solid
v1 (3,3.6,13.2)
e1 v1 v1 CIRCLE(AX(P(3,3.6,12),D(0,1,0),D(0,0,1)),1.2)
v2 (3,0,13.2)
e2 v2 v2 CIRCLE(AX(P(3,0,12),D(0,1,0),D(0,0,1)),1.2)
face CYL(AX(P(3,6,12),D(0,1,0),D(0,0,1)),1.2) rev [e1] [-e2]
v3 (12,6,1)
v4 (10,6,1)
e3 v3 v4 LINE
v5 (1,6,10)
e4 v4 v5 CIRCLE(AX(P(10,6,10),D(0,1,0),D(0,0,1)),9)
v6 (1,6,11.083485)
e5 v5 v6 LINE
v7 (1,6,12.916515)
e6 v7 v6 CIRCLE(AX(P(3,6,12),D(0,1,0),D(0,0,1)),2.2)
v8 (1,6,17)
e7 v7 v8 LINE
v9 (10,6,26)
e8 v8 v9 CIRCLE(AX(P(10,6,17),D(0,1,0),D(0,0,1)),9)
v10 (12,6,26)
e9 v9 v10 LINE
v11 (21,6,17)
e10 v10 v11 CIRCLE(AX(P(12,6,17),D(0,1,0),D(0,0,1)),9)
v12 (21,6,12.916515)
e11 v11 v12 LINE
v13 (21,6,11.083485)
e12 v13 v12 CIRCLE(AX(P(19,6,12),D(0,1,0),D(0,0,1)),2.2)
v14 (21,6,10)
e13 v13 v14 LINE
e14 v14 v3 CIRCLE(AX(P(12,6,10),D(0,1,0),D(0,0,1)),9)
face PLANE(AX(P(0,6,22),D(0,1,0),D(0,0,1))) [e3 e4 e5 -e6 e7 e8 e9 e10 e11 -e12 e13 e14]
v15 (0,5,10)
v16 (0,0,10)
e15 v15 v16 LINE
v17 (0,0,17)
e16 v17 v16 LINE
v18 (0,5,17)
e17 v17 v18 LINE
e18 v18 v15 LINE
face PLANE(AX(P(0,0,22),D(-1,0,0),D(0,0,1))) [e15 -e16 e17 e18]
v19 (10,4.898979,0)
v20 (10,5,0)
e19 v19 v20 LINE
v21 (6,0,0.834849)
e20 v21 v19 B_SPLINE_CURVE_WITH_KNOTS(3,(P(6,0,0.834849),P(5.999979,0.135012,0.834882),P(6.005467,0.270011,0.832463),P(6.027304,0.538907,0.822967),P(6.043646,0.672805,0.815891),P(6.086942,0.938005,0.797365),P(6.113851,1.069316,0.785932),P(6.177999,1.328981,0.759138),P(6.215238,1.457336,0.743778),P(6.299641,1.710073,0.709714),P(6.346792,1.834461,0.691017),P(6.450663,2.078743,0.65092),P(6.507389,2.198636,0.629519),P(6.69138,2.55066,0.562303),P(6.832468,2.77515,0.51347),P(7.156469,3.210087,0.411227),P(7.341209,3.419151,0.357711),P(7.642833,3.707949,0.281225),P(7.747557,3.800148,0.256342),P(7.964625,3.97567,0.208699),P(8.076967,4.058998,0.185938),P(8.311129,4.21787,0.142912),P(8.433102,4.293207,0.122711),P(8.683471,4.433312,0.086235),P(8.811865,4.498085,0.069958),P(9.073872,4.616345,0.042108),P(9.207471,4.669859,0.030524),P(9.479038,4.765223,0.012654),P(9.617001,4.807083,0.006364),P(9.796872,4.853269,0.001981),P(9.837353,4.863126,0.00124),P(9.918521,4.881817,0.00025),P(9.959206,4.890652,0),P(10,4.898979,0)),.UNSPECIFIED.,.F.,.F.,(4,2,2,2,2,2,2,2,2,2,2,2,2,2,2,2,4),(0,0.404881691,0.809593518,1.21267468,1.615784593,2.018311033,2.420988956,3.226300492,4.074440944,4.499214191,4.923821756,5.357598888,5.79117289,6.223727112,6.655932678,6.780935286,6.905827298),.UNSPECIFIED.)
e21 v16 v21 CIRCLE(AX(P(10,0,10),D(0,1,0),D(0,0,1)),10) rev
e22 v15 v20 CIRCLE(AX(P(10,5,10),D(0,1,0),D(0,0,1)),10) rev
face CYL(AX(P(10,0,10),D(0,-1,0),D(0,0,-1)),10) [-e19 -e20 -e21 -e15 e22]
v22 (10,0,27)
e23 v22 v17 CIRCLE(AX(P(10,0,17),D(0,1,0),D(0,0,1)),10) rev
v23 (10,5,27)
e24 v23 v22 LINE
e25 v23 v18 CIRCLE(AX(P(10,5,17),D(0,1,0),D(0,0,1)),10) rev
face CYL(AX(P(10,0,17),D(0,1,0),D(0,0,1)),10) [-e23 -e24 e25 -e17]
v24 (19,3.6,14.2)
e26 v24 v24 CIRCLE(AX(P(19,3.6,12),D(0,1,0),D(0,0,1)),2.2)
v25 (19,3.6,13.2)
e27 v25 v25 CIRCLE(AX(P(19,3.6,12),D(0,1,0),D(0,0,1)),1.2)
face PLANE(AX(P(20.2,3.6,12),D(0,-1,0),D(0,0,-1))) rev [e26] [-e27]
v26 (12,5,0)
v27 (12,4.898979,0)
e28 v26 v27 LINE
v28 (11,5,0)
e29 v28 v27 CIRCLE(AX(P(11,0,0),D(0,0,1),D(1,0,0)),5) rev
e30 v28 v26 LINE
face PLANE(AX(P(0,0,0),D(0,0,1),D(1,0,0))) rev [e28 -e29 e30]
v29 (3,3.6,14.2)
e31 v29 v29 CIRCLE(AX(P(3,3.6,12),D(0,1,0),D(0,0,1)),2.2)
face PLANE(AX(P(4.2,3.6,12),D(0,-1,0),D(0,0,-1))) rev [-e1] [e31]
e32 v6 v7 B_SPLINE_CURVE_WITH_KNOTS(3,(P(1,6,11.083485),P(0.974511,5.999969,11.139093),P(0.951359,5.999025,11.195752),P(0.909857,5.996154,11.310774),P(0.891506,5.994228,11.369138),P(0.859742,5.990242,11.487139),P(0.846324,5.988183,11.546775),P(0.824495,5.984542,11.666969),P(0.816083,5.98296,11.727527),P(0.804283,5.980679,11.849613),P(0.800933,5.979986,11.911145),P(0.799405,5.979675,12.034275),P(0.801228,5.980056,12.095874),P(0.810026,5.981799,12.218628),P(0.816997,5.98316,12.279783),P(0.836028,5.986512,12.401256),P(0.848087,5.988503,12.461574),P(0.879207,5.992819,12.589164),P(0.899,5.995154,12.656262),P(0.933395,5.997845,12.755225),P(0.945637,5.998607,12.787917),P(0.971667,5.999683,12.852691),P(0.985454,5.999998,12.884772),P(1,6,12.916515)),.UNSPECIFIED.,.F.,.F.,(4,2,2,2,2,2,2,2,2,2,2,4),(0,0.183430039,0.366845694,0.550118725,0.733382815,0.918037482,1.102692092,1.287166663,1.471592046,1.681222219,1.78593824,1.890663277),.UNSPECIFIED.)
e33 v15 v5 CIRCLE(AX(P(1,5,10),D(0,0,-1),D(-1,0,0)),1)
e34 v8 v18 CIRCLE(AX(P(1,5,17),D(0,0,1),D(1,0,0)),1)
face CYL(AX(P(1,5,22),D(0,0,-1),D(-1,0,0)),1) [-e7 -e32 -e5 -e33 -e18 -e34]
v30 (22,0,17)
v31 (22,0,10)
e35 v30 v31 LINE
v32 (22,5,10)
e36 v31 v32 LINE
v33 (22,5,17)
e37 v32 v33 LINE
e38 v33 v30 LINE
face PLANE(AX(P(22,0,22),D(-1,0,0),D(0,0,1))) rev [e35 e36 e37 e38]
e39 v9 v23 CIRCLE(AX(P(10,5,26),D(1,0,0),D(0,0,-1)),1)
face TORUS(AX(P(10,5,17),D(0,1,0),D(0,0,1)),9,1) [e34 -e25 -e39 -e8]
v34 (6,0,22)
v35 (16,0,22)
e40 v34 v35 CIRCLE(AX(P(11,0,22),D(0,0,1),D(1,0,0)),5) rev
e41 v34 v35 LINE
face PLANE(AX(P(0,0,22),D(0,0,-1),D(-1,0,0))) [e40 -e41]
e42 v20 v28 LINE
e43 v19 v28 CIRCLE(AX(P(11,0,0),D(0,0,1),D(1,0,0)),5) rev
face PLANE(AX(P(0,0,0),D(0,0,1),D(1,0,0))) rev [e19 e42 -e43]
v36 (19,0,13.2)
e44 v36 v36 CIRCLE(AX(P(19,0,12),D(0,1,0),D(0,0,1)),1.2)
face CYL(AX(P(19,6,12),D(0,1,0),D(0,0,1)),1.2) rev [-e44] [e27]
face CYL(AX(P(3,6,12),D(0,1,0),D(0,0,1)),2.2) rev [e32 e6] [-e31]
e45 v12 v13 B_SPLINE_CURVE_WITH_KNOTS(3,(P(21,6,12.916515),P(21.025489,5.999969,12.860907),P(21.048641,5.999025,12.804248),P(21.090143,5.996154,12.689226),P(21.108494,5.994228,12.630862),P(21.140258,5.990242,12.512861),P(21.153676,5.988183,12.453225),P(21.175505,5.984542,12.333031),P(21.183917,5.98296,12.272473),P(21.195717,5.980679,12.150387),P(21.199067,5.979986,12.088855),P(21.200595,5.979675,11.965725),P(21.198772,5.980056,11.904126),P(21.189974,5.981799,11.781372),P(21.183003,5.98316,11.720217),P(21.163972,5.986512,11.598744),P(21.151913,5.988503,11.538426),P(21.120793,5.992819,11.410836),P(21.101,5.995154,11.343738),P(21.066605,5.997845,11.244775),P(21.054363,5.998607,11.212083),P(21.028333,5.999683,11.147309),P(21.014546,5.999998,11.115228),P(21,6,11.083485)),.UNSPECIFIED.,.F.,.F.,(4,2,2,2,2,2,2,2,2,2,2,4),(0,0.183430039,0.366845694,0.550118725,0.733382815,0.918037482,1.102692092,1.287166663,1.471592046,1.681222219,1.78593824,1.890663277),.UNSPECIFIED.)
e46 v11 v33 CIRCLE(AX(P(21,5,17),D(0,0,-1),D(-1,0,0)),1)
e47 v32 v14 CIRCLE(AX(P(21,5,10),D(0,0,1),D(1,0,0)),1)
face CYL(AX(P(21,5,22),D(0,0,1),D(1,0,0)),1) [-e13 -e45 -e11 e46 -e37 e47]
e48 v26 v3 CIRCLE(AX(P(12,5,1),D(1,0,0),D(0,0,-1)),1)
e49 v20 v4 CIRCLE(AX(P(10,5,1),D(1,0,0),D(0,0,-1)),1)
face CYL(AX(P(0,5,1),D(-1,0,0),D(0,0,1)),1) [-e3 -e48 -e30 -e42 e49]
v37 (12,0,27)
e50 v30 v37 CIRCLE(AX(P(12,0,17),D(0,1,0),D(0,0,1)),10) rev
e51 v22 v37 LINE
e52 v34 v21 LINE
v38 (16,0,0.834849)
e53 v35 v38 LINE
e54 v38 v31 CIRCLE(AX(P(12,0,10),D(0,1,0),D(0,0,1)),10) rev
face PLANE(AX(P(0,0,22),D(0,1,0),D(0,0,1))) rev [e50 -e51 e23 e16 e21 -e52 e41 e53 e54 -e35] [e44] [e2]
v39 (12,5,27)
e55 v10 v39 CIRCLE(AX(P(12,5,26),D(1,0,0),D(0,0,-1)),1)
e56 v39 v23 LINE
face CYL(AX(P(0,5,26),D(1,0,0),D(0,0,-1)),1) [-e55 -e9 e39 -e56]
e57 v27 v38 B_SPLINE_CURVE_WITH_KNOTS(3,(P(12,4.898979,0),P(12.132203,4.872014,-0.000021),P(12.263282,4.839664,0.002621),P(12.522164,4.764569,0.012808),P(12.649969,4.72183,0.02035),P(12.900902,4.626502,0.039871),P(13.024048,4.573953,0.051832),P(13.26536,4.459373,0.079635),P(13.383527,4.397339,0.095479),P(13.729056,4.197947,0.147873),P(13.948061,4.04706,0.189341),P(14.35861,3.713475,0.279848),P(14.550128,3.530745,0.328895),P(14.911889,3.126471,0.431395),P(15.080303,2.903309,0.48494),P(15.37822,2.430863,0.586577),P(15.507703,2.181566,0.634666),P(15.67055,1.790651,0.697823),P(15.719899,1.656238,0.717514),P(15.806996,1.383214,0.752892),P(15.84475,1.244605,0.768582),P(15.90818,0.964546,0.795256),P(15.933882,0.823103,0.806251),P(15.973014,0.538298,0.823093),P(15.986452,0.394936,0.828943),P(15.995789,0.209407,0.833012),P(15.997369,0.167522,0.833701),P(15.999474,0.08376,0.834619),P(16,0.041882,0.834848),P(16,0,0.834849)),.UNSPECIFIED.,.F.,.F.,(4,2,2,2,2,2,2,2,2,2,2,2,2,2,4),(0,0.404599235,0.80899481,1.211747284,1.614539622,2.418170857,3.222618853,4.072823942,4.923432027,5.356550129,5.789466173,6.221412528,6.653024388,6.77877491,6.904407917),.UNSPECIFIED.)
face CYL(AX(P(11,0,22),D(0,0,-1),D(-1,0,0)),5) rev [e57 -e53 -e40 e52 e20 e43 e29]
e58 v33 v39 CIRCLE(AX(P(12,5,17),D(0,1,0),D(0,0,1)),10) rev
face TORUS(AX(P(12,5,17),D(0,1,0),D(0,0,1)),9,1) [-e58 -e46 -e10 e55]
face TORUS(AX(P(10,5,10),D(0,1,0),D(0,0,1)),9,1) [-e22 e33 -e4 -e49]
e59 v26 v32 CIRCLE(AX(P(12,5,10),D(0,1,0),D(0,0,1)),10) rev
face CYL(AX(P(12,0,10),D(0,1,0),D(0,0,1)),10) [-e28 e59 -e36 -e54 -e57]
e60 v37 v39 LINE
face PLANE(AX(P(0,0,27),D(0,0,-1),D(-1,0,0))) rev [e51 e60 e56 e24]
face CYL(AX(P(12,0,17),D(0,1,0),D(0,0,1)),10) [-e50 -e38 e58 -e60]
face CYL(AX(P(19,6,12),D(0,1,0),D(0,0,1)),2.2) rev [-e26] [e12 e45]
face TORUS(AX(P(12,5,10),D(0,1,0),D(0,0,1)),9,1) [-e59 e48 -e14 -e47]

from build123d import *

# Parameters (mm, degrees)
BOSS_EXTRU_1_DEPTH                                 = 22
ESQUISSE2_W                                        = 22
ESQUISSE2_H                                        = 6
BOSS_EXTRU_2_DEPTH                                 = 5
CHAMBRAGE_POUR_VIS_T_TE_HEXAGONALE_M21_D           = 2.4
CHAMBRAGE_POUR_VIS_T_TE_HEXAGONALE_M21_CBORE_D     = 4.4
CHAMBRAGE_POUR_VIS_T_TE_HEXAGONALE_M21_CBORE_DEPTH = 2.4
CONG_1_R                                           = 10
CONG_2_R                                           = 1


with BuildPart() as part:
    # Esquisse1 → Boss.-Extru.1 (new body)
    with BuildSketch(Plane.XY):
        with BuildLine():
            Line((0, 6), (0, 0))
            Line((0, 0), (6, 0))
            ThreePointArc((6, 0), (11, 5), (16, 0))
            Line((16, 0), (22, 0))
            Line((22, 0), (22, 6))
            Line((22, 6), (0, 6))
        make_face()
    extrude(amount=BOSS_EXTRU_1_DEPTH)

    # Esquisse2 → Boss.-Extru.2 (add)
    with BuildSketch(Plane.XY.offset(22)):
        with Locations((11, 3)):
            Rectangle(ESQUISSE2_W, ESQUISSE2_H)
    extrude(amount=BOSS_EXTRU_2_DEPTH)

    # Chambrage pour vis à tête hexagonale M21 (through all)
    with Locations(Plane(origin=(0, 6, 0), x_dir=(1, 0, 0), z_dir=(0, 1, 0))):
        with Locations((19, -12), (3, -12)):
            CounterBoreHole(CHAMBRAGE_POUR_VIS_T_TE_HEXAGONALE_M21_D / 2, CHAMBRAGE_POUR_VIS_T_TE_HEXAGONALE_M21_CBORE_D / 2, CHAMBRAGE_POUR_VIS_T_TE_HEXAGONALE_M21_CBORE_DEPTH)

    # Congé1
    # the kernel refuses this fillet: 10 mm, written as the material it takes off along each edge
    with BuildSketch(Plane(origin=(0, 31, 0), x_dir=(0, 0, 1), z_dir=(0, -1, 0)), Plane(origin=(22, -25, 27), x_dir=(-1, 0, 0), z_dir=(0, 1, 0))) as cong_1_piece_1:
        with BuildLine():
            CenterArc((CONG_1_R, -CONG_1_R), CONG_1_R, 90, 90)
            Line((0, -CONG_1_R), (0, 0))
            Line((0, 0), (CONG_1_R, 0))
        make_face()
    extrude(amount=56, mode=Mode.SUBTRACT)
    with BuildSketch(Plane(origin=(0, 31, 27), x_dir=(0, 0, -1), z_dir=(0, -1, 0)), Plane(origin=(22, -25, 0), x_dir=(-1, 0, 0), z_dir=(0, 1, 0))) as cong_1_piece_2:
        with BuildLine():
            CenterArc((CONG_1_R, CONG_1_R), CONG_1_R, 180, 90)
            Line((0, CONG_1_R), (0, 0))
            Line((0, 0), (CONG_1_R, 0))
        make_face()
    extrude(amount=56, mode=Mode.SUBTRACT)

    # Congé2
    # the kernel refuses this fillet: 1 mm, written as the material it takes off along each edge
    with BuildSketch(Plane(origin=(12, 6, 0), x_dir=(0, 0, 1), z_dir=(-1, 0, 0))) as cong_2_piece_1:
        with BuildLine():
            CenterArc((CONG_2_R, -CONG_2_R), CONG_2_R, 90, 90)
            Line((0, -CONG_2_R), (0, 0))
            Line((0, 0), (CONG_2_R, 0))
        make_face()
    extrude(amount=2, mode=Mode.SUBTRACT)
    with BuildSketch(Plane(origin=(0, 6, 17), x_dir=(0, -1, 0), z_dir=(0, 0, -1)), Plane(origin=(22, 6, 17), x_dir=(-1, 0, 0), z_dir=(0, 0, -1))) as cong_2_piece_2:
        with BuildLine():
            CenterArc((CONG_2_R, -CONG_2_R), CONG_2_R, 90, 90)
            Line((0, -CONG_2_R), (0, 0))
            Line((0, 0), (CONG_2_R, 0))
        make_face()
    extrude(amount=7, mode=Mode.SUBTRACT)
    with BuildSketch(Plane(origin=(12, 6, 27), x_dir=(0, 0, -1), z_dir=(-1, 0, 0))) as cong_2_piece_3:
        with BuildLine():
            CenterArc((CONG_2_R, CONG_2_R), CONG_2_R, 180, 90)
            Line((0, CONG_2_R), (0, 0))
            Line((0, 0), (CONG_2_R, 0))
        make_face()
    extrude(amount=2, mode=Mode.SUBTRACT)
    with BuildSketch(Plane(origin=(12, 6, 17), x_dir=(1, 0, 0), z_dir=(0, 0, -1))) as cong_2_piece_4:
        with BuildLine():
            CenterArc((10 - CONG_2_R, CONG_2_R), CONG_2_R, 270, 90)
            Line((10, CONG_2_R), (10, 0))
            Line((10, 0), (10 - CONG_2_R, 0))
        make_face()
    revolve(axis=Axis((12, 6, 17), (0, -1, 0)), revolution_arc=90, mode=Mode.SUBTRACT)
    with BuildSketch(Plane(origin=(12, 6, 10), x_dir=(0, 0, -1), z_dir=(-1, 0, 0))) as cong_2_piece_5:
        with BuildLine():
            CenterArc((10 - CONG_2_R, CONG_2_R), CONG_2_R, 270, 90)
            Line((10, CONG_2_R), (10, 0))
            Line((10, 0), (10 - CONG_2_R, 0))
        make_face()
    revolve(axis=Axis((12, 6, 10), (0, -1, 0)), revolution_arc=90, mode=Mode.SUBTRACT)
    with BuildSketch(Plane(origin=(10, 6, 17), x_dir=(-1, 0, 0), z_dir=(0, 0, -1))) as cong_2_piece_6:
        with BuildLine():
            CenterArc((10 - CONG_2_R, -CONG_2_R), CONG_2_R, 0, 90)
            Line((10, -CONG_2_R), (10, 0))
            Line((10, 0), (10 - CONG_2_R, 0))
        make_face()
    revolve(axis=Axis((10, 6, 17), (0, 1, 0)), revolution_arc=90, mode=Mode.SUBTRACT)
    with BuildSketch(Plane(origin=(10, 6, 10), x_dir=(0, 0, -1), z_dir=(1, 0, 0))) as cong_2_piece_7:
        with BuildLine():
            CenterArc((10 - CONG_2_R, -CONG_2_R), CONG_2_R, 0, 90)
            Line((10, -CONG_2_R), (10, 0))
            Line((10, 0), (10 - CONG_2_R, 0))
        make_face()
    revolve(axis=Axis((10, 6, 10), (0, 1, 0)), revolution_arc=90, mode=Mode.SUBTRACT)


solid = part.part
